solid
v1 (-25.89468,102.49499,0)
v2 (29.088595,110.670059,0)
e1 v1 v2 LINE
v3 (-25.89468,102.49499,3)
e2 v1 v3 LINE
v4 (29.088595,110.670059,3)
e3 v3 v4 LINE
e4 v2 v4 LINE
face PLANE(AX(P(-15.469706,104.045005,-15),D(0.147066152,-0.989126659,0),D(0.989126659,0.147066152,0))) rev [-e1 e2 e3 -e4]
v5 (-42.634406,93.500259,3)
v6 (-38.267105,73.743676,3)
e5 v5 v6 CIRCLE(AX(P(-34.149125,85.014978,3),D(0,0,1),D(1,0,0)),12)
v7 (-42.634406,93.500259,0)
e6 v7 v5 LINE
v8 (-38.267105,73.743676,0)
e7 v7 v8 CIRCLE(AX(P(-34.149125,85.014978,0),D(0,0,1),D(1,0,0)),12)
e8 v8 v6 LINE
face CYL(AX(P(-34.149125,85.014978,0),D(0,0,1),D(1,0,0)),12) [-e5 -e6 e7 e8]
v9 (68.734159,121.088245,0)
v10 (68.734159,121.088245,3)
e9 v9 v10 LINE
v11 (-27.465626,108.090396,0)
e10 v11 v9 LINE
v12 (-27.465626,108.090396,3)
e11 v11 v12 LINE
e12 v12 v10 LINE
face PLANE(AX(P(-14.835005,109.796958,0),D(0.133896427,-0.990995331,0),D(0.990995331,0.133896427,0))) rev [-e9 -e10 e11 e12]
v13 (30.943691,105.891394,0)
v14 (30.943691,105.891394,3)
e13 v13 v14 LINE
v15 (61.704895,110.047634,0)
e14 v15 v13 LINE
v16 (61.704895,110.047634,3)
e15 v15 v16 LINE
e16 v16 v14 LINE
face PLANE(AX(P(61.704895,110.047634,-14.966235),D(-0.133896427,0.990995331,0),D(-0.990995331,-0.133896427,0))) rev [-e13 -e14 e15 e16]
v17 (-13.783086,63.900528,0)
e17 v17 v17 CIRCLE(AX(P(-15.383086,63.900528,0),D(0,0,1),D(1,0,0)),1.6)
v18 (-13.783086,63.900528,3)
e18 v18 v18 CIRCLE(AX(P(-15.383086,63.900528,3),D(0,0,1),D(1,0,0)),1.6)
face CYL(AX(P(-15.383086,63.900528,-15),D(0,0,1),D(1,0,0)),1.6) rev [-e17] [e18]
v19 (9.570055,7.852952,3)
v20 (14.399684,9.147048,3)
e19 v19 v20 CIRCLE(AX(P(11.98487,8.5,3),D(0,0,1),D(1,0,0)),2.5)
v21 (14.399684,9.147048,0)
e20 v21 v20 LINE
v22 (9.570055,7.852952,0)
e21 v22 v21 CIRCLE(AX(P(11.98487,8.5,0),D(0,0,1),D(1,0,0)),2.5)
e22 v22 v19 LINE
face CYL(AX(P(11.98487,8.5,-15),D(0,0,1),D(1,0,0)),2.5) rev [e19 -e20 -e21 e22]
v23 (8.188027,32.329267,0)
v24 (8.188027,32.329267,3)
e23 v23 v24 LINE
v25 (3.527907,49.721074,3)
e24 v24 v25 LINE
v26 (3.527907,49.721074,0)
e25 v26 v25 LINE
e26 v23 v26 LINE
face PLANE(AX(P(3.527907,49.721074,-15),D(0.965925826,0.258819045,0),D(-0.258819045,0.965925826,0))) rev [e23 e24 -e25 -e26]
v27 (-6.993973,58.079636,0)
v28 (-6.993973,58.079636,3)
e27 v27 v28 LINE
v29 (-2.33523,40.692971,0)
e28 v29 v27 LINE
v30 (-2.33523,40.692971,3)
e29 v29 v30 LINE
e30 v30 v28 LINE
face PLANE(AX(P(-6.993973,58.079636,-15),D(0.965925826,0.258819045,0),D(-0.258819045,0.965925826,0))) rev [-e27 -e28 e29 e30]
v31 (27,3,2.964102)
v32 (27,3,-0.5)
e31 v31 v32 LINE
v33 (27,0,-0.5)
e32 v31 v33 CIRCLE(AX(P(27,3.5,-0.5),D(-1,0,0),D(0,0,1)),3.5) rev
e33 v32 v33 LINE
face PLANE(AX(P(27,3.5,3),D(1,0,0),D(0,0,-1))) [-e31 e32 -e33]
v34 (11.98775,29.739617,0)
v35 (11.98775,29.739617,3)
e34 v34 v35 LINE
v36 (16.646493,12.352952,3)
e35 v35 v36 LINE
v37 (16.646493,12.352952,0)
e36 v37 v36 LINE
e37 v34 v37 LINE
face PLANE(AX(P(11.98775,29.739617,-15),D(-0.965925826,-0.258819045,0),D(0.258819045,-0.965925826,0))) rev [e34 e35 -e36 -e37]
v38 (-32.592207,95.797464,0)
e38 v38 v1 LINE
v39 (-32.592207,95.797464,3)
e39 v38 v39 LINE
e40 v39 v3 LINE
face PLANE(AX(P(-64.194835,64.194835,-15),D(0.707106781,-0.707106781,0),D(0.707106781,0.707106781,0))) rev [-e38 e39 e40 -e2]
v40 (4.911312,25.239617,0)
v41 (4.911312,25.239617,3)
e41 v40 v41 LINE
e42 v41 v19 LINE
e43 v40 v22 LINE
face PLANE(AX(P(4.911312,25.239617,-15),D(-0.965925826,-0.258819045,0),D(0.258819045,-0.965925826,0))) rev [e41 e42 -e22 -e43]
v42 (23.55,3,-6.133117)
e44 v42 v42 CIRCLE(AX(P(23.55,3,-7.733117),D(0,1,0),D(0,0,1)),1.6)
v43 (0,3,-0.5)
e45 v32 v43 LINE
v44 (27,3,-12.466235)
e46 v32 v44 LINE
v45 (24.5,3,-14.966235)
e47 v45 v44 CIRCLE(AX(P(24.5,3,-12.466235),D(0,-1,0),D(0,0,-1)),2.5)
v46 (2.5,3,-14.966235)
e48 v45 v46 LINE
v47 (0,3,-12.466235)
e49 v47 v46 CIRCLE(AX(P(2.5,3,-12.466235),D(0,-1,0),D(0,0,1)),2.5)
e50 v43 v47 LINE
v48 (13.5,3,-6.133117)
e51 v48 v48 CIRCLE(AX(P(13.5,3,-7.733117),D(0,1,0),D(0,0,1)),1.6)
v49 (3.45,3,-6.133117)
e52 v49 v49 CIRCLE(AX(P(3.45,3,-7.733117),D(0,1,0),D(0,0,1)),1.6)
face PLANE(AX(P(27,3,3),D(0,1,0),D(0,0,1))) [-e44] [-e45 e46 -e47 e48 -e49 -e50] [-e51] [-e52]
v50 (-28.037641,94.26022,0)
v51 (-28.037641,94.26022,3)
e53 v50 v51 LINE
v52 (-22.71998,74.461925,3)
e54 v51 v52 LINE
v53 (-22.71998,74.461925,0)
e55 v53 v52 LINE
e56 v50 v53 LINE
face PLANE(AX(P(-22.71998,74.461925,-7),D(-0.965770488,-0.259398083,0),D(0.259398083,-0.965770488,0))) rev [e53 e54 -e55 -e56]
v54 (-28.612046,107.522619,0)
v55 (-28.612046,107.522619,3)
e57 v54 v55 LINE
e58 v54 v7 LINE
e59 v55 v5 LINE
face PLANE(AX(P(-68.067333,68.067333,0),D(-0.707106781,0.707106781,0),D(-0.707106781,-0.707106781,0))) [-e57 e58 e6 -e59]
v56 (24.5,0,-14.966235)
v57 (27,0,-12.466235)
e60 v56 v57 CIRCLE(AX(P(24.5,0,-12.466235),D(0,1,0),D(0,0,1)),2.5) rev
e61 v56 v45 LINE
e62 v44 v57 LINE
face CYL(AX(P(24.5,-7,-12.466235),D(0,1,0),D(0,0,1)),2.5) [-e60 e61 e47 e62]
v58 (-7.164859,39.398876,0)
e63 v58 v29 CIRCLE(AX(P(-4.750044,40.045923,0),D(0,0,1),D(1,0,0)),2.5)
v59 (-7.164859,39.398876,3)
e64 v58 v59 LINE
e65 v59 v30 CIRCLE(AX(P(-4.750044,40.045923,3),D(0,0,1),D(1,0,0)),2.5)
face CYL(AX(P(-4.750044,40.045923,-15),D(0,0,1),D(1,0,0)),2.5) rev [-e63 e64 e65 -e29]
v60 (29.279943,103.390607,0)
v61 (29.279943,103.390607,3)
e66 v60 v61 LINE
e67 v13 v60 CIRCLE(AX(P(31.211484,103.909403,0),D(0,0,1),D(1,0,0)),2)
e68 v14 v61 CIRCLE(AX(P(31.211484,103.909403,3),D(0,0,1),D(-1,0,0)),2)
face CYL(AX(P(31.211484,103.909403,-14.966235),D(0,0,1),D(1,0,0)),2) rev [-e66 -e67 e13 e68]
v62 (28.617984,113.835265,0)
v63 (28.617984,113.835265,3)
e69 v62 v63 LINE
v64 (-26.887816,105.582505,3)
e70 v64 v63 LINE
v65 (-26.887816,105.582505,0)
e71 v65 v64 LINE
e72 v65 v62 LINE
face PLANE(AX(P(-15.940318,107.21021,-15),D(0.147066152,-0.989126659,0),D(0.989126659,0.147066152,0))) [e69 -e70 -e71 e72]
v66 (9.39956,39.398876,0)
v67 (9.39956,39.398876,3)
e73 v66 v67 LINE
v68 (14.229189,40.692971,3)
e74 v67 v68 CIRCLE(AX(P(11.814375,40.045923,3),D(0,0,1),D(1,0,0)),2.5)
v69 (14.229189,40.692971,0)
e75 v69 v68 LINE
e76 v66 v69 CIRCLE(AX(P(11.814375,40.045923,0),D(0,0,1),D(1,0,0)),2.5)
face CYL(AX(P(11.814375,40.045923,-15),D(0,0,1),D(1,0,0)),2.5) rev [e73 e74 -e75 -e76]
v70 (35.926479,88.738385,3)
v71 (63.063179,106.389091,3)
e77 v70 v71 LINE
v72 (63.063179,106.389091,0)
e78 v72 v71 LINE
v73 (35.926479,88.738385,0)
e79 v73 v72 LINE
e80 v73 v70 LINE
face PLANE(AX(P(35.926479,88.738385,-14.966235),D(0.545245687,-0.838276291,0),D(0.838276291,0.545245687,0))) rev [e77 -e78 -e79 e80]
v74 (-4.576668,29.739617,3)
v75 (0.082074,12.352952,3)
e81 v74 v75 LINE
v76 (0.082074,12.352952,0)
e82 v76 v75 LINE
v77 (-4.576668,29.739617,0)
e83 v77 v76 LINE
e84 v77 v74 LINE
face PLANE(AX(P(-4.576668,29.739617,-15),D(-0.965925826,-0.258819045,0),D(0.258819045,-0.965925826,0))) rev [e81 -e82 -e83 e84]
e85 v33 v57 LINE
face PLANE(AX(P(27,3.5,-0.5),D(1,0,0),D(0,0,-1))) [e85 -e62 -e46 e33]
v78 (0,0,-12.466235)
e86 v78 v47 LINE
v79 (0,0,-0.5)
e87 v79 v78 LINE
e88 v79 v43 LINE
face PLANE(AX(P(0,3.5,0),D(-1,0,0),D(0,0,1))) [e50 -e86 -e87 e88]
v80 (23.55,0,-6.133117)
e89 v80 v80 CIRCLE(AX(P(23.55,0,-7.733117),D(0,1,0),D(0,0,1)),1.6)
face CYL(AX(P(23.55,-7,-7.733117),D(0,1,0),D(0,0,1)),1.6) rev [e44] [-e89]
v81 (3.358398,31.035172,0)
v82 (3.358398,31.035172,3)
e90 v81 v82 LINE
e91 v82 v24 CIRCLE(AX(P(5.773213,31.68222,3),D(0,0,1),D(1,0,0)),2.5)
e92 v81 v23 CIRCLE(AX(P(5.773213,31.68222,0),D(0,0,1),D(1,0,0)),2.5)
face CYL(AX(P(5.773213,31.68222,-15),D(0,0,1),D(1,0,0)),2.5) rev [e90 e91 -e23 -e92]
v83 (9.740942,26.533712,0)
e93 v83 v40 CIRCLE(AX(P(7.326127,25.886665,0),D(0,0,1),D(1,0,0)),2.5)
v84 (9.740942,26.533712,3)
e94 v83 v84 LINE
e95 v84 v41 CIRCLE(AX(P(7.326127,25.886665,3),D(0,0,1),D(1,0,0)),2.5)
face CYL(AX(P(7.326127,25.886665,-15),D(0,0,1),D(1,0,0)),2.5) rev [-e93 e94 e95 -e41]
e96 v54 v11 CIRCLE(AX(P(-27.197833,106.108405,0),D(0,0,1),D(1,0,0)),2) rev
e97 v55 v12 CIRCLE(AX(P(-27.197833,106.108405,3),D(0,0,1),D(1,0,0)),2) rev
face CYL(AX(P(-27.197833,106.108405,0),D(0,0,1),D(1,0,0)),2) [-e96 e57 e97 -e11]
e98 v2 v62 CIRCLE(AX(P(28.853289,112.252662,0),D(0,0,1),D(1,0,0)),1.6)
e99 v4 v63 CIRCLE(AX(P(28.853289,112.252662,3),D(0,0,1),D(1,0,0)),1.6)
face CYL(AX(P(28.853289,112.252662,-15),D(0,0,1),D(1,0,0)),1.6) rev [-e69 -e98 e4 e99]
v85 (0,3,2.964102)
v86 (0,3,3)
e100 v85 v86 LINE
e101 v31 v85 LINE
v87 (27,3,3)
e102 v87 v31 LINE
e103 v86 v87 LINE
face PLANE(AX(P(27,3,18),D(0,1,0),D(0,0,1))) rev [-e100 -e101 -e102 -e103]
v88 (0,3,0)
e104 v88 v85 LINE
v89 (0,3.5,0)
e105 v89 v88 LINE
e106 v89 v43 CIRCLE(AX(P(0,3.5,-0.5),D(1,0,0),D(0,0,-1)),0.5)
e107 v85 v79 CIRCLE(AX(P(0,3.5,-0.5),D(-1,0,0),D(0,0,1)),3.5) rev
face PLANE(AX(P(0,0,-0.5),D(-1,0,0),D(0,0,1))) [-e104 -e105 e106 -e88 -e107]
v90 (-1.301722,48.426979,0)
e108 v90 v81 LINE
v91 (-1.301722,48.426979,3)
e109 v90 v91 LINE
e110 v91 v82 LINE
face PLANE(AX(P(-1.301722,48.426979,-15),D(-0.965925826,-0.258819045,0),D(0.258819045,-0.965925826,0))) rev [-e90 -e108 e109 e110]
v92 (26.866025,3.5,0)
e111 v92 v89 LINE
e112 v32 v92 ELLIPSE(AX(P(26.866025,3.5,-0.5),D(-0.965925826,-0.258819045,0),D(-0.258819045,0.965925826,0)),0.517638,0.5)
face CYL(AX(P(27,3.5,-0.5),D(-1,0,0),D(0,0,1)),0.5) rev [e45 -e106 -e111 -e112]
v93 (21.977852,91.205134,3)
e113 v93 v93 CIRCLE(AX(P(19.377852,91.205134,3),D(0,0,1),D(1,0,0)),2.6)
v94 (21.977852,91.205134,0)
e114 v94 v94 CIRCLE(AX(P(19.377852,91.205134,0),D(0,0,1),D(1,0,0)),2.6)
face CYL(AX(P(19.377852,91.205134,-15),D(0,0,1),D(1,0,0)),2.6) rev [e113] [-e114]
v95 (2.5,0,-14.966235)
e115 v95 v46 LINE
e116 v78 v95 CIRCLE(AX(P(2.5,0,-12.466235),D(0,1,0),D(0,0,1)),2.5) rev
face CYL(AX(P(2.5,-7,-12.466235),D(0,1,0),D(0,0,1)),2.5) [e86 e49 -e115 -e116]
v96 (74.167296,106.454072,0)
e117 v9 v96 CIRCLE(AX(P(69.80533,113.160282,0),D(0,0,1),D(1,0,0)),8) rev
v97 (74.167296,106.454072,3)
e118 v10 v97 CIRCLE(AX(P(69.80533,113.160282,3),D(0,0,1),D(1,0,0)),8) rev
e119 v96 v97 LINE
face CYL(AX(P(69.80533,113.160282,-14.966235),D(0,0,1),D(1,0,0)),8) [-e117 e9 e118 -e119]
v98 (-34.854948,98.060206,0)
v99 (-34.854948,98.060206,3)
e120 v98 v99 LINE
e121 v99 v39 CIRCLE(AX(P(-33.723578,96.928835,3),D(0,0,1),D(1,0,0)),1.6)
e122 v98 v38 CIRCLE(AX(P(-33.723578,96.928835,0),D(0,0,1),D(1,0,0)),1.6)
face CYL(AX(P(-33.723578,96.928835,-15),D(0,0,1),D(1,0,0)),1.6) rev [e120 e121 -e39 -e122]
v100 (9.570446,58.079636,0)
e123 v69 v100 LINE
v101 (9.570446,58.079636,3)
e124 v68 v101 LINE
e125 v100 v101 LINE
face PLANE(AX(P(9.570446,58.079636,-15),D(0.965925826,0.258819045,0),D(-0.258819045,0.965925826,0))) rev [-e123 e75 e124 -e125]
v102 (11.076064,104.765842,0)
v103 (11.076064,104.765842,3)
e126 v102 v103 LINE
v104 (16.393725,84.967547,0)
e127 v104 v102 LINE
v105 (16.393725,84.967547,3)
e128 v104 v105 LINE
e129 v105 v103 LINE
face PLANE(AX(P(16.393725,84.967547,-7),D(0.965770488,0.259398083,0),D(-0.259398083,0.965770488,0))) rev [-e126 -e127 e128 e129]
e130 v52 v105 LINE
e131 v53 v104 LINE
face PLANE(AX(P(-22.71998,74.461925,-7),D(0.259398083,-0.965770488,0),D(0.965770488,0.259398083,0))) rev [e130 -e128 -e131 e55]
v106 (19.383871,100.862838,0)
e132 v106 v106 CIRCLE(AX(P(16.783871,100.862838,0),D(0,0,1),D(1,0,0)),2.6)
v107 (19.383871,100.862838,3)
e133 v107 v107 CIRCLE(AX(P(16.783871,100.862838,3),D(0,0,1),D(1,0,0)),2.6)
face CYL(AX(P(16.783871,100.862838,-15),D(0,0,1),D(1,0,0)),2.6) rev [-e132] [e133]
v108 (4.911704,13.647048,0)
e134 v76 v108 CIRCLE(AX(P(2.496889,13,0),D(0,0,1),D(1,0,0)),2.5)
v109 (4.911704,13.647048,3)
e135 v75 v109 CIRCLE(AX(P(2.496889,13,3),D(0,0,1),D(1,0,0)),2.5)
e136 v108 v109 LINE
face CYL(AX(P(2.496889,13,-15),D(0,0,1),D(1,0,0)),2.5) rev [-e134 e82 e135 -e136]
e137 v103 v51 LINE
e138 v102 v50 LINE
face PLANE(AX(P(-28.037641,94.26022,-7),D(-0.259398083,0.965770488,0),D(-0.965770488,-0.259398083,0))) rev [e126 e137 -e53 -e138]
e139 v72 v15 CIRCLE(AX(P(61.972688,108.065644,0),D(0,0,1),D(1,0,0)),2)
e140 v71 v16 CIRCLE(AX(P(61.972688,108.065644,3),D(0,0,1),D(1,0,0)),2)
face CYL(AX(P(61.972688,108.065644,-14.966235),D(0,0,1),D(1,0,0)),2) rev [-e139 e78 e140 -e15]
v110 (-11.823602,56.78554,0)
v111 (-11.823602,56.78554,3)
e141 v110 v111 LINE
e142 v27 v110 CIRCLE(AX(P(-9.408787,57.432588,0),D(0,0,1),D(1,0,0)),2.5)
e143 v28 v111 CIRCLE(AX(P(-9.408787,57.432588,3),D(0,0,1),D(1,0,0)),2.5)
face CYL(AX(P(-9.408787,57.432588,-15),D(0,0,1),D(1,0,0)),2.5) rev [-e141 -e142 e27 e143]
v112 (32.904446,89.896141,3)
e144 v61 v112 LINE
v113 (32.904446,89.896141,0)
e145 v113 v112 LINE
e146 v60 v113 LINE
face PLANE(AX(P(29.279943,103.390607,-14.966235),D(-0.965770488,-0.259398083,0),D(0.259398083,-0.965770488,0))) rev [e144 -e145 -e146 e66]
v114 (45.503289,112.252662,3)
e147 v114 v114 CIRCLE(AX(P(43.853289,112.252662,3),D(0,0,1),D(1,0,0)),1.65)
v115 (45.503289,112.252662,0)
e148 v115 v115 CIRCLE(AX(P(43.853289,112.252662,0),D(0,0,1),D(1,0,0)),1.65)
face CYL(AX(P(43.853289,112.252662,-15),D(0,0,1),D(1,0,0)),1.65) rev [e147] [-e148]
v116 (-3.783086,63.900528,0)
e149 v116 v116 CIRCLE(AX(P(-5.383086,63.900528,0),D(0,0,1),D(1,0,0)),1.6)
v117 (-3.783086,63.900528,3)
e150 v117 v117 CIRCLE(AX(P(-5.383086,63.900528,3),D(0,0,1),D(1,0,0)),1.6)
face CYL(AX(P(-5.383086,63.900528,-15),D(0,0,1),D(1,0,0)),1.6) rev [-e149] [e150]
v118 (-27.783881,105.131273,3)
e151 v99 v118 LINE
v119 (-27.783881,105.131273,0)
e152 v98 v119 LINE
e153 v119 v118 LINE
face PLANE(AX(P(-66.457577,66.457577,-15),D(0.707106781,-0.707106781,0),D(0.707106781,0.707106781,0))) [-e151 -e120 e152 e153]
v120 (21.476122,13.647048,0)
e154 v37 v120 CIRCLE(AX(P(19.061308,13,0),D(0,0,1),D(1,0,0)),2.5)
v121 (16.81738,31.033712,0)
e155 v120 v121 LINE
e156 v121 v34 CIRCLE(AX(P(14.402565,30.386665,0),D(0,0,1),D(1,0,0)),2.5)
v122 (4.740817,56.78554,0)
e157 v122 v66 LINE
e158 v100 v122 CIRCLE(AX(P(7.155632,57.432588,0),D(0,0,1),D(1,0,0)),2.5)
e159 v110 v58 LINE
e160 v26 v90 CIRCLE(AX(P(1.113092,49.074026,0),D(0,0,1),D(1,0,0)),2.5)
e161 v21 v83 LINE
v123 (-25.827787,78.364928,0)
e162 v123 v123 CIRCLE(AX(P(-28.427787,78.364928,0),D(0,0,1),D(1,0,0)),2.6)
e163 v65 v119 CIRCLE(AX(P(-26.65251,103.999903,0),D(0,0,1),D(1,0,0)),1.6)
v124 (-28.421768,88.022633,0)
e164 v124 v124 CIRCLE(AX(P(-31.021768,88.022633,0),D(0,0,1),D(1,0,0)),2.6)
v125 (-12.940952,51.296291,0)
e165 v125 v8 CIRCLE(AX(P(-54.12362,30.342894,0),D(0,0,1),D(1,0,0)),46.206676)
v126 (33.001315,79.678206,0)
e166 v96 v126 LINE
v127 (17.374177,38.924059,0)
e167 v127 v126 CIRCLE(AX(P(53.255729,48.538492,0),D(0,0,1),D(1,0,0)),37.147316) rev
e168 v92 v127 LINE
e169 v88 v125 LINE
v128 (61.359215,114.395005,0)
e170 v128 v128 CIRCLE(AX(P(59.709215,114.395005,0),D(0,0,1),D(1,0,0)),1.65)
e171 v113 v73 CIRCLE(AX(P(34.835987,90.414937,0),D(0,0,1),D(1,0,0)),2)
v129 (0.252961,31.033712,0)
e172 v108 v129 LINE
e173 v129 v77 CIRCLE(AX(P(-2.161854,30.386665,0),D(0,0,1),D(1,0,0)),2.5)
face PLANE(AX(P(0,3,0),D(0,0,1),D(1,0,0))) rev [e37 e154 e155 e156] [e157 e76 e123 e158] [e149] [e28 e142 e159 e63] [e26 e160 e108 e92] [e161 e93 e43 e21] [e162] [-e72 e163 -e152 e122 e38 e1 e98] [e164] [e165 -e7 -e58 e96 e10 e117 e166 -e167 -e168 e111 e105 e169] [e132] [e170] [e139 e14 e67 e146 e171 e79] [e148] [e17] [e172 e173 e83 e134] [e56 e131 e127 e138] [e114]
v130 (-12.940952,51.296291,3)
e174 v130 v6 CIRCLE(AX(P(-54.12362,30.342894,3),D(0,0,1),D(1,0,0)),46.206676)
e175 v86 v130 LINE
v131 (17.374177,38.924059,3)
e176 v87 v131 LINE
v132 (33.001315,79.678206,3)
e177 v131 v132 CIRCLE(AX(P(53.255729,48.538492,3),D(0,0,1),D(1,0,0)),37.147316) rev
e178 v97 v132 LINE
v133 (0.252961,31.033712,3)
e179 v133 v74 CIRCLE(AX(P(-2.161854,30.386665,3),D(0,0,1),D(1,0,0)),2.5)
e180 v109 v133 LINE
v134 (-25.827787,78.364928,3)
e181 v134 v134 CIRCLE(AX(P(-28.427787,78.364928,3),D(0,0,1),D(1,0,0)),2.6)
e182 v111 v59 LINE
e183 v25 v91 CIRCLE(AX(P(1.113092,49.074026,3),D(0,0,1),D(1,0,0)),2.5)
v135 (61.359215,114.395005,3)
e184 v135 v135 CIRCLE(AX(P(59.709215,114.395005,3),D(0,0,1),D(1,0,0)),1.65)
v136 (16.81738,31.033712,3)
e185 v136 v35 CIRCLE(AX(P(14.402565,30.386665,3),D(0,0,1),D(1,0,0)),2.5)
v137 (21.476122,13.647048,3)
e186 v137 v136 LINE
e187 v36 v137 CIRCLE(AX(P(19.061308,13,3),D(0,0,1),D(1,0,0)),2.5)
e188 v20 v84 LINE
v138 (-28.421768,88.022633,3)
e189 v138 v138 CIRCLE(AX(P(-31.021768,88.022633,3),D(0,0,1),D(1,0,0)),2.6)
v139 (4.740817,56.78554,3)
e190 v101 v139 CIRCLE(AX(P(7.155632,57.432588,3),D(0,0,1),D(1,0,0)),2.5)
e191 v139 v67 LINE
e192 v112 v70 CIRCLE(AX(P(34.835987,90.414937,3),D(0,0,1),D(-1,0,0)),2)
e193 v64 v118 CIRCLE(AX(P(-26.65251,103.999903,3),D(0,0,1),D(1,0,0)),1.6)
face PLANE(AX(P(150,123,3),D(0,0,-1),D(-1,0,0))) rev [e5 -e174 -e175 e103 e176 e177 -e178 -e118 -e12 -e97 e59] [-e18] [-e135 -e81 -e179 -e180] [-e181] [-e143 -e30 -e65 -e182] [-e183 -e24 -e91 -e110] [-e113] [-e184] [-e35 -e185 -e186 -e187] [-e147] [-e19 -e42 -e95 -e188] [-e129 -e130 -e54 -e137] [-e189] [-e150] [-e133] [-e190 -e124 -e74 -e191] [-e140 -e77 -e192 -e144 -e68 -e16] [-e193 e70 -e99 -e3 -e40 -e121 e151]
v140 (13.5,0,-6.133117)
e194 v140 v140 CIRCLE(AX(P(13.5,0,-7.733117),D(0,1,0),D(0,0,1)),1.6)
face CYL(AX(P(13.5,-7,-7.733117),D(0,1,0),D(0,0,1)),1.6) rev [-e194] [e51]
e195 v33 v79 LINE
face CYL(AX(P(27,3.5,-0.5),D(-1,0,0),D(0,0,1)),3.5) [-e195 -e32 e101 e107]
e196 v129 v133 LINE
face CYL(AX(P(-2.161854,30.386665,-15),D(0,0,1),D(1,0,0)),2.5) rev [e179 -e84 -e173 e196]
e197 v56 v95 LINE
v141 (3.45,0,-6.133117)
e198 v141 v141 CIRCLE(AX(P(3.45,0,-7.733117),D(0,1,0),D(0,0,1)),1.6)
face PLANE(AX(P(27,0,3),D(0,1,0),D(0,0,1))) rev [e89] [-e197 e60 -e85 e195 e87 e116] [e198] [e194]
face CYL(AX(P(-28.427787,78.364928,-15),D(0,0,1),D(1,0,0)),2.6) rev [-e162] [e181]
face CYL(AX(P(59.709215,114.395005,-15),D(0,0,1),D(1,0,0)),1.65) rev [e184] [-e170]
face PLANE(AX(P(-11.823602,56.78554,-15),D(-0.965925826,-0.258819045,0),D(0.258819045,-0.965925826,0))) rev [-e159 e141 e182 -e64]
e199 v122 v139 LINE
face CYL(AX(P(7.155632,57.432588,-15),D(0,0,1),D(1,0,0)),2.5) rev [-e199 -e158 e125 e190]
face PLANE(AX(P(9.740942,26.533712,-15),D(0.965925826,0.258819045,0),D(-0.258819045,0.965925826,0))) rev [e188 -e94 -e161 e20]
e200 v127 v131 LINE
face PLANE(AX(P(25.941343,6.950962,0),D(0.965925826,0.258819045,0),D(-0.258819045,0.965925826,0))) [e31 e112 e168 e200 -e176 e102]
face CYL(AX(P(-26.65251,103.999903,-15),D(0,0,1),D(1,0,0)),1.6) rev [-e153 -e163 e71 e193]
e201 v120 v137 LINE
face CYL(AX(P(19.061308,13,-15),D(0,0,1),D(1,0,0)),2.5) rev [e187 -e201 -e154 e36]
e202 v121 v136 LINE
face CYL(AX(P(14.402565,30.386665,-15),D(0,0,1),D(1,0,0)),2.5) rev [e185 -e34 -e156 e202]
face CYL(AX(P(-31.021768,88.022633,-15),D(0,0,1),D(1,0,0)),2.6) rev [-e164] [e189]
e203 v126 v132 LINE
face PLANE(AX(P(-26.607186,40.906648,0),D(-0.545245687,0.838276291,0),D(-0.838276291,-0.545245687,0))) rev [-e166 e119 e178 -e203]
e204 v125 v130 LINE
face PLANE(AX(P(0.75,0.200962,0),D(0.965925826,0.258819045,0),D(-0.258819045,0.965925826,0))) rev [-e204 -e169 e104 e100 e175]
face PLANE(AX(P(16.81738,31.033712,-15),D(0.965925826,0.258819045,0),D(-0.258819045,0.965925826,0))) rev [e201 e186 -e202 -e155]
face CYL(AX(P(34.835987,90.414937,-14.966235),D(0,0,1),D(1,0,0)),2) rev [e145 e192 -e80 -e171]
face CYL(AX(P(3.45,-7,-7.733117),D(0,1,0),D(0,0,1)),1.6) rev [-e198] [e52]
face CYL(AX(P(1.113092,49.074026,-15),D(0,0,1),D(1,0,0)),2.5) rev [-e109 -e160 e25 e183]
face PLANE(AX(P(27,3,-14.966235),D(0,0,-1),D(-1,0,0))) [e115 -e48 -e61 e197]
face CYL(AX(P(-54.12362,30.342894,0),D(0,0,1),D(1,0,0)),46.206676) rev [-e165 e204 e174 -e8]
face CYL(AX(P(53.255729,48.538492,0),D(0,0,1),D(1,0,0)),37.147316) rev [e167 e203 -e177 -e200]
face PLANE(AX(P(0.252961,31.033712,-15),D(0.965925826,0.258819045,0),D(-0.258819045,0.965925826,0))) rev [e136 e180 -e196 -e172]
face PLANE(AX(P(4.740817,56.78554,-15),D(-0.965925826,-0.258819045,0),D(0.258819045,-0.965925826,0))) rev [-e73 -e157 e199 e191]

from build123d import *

# Parameters (mm, degrees)
EXTRUDE_1_DEPTH              = 3
EXTRUDE_2_DEPTH              = 120
CUT_EXTRUDE_1_DEPTH          = 195.561044405
SKETCH_9_R                   = 0.555167329
CUT_EXTRUDE_3_DEPTH          = 10
HOLE_WIZARD_M5_1_D           = 4.2
HOLE_WIZARD_M5_1_DEPTH       = 12.4
HOLE_WIZARD_M5_1_CSINK_D     = 5.05
HOLE_WIZARD_M5_1_CSINK_ANGLE = 90
HOLE_WIZARD_M5_1_TIP         = 1.2618073
SKETCH_12_R                  = 0.419228838
SKETCH_12_R_2                = 0.457437139
CUT_EXTRUDE_4_DEPTH          = 10
HOLE_WIZARD_M3_1_D           = 2.5
HOLE_WIZARD_M3_1_DEPTH       = 7.5
HOLE_WIZARD_M3_1_CSINK_D     = 3.05
HOLE_WIZARD_M3_1_CSINK_ANGLE = 90
HOLE_WIZARD_M3_1_TIP         = 0.751075774
SKETCH_31_W                  = 27
SKETCH_31_H                  = 3
CUT_EXTRUDE_7_DEPTH          = 18
SKETCH_42_R                  = 1.6
SKETCH_42_R_2                = 2.6
CUT_EXTRUDE_9_DEPTH          = 18
SKETCH_43_R                  = 1.65
CUT_EXTRUDE_10_DEPTH         = 18
SM_BASE_FLANGE_2_DEPTH       = 27
CUT_EXTRUDE_11_DEPTH         = 10
SKETCH_54_R                  = 1.6
CUT_EXTRUDE_12_DEPTH         = 10
CUT_EXTRUDE_13_DEPTH         = 153.01995181
CUT_EXTRUDE_14_DEPTH         = 153.01995181


# Sheet-metal steps are written as plain solids
with BuildPart() as part:
    # 草图2 → 凸台-拉伸1 (new body)
    with BuildSketch(Plane(origin=(0, 0, 0), x_dir=(1, 0, 0), z_dir=(0, 1, 0))):
        with BuildLine():
            Line((0, 0), (27, 0))
            Line((27, 0), (27, -16))
            ThreePointArc((27, -16), (26.414213562, -17.414213562), (25, -18))
            Line((25, -18), (2, -18))
            ThreePointArc((2, -18), (0.585786438, -17.414213562), (0, -16))
            Line((0, -16), (0, 0))
        make_face()
    extrude(amount=EXTRUDE_1_DEPTH)

    # Sketch 3 → 凸台-拉伸2 (add)
    with BuildSketch(Plane(origin=(0, 3, 0), x_dir=(1, 0, 0), z_dir=(0, 1, 0))):
        Polygon((0, 0), (150, 0), (150, -3), (-100, -3), (-100, 0), align=None)
    extrude(amount=EXTRUDE_2_DEPTH)

    # Sketch 4 → 切除-拉伸1 (cut, through all)
    with BuildSketch(Plane.XY.offset(3)):
        with BuildLine():
            Line((-27.465625599, 108.090395999), (81.955038276, 122.874558425))
            ThreePointArc((81.955038276, 122.874558425), (87.311898998, 119.659835192), (85.350748847, 113.728200311))
            Line((85.350748847, 113.728200311), (33.001315422, 79.678206183))
            ThreePointArc((33.001315422, 79.678206183), (18.570908538, 61.838352676), (17.374177378, 38.924059091))
            Line((17.374177378, 38.924059091), (27, 3))
            Line((27, 3), (150, 3))
            Line((150, 3), (150, 123))
            Line((150, 123), (-100, 123))
            Line((-100, 123), (-100, 3))
            Line((-100, 3), (0, 3))
            Line((0, 3), (-12.940952255, 51.296291314))
            ThreePointArc((-12.940952255, 51.296291314), (-23.474992402, 64.922058411), (-38.267104772, 73.743676313))
            ThreePointArc((-38.267104772, 73.743676313), (-45.866257029, 82.424841396), (-42.634405947, 93.500259258))
            Line((-42.634405947, 93.500259258), (-28.612046307, 107.522618899))
            ThreePointArc((-28.612046307, 107.522618899), (-28.085458288, 107.900644409), (-27.465625599, 108.090395999))
        make_face()
    extrude(amount=-CUT_EXTRUDE_1_DEPTH, mode=Mode.SUBTRACT)

    # 草图9 → 切除-拉伸3 (cut)
    with BuildSketch(Plane.XY.offset(3)):
        with Locations((-28.427787155, 78.364928444)):
            Circle(SKETCH_9_R)
        with Locations((-31.021767983, 88.02263332)):
            Circle(SKETCH_9_R)
        with Locations((19.37785198, 91.205133539)):
            Circle(SKETCH_9_R)
        with Locations((16.783871152, 100.862838415)):
            Circle(SKETCH_9_R)
        Polygon((-22.719980027, 74.461924756), (-28.037640723, 94.260219752), (11.076064024, 104.765842103), (16.39372472, 84.967547107), align=None)
    extrude(amount=-CUT_EXTRUDE_3_DEPTH, mode=Mode.SUBTRACT)

    # M5 螺纹孔1
    with Locations(Plane.XY.offset(3)):
        with Locations((-31.021767983, 88.02263332), (-28.427787155, 78.364928444), (16.783871152, 100.862838415), (19.37785198, 91.205133539)):
            CounterSinkHole(HOLE_WIZARD_M5_1_D / 2, HOLE_WIZARD_M5_1_CSINK_D / 2, depth=HOLE_WIZARD_M5_1_DEPTH, counter_sink_angle=HOLE_WIZARD_M5_1_CSINK_ANGLE)
            with Locations((0, 0, -(HOLE_WIZARD_M5_1_DEPTH + HOLE_WIZARD_M5_1_TIP / 2))):  # 118° drill point
                Cone(0, HOLE_WIZARD_M5_1_D / 2, HOLE_WIZARD_M5_1_TIP, mode=Mode.SUBTRACT)

    # 草图12 → 切除-拉伸4 (cut)
    with BuildSketch(Plane.XY.offset(3)):
        with Locations((-5.383085829, 63.900528175)):
            Circle(SKETCH_12_R)
        with Locations((-15.383085829, 63.900528175)):
            Circle(SKETCH_12_R_2)
        Polygon((-27.731348581, 94.083626651), (10.899470923, 104.45954996), (16.087432577, 85.144140208), (-22.543386926, 74.768216899), align=None)
    extrude(amount=-CUT_EXTRUDE_4_DEPTH, mode=Mode.SUBTRACT)

    # M3 螺纹孔1
    with Locations(Plane.XY.offset(3)):
        with Locations((-15.383085829, 63.900528175), (-5.383085829, 63.900528175)):
            CounterSinkHole(HOLE_WIZARD_M3_1_D / 2, HOLE_WIZARD_M3_1_CSINK_D / 2, depth=HOLE_WIZARD_M3_1_DEPTH, counter_sink_angle=HOLE_WIZARD_M3_1_CSINK_ANGLE)
            with Locations((0, 0, -(HOLE_WIZARD_M3_1_DEPTH + HOLE_WIZARD_M3_1_TIP / 2))):  # 118° drill point
                Cone(0, HOLE_WIZARD_M3_1_D / 2, HOLE_WIZARD_M3_1_TIP, mode=Mode.SUBTRACT)

    # 草图31 → 切除-拉伸7 (cut)
    with BuildSketch(Plane(origin=(0, 0, 0), x_dir=(-1, 0, 0), z_dir=(0, 0, -1))):
        with Locations((-13.5, 1.5)):
            Rectangle(SKETCH_31_W, SKETCH_31_H)
    extrude(amount=-CUT_EXTRUDE_7_DEPTH, mode=Mode.SUBTRACT)

    # 草图42 → 切除-拉伸9 (cut)
    with BuildSketch(Plane.XY.offset(3)):
        with Locations((-15.383085829, 63.900528175)):
            Circle(SKETCH_42_R)
        with Locations((-5.383085829, 63.900528175)):
            Circle(SKETCH_42_R)
        with Locations((-28.427787155, 78.364928444)):
            Circle(SKETCH_42_R_2)
        with Locations((-31.021767983, 88.02263332)):
            Circle(SKETCH_42_R_2)
        with Locations((16.783871152, 100.862838415)):
            Circle(SKETCH_42_R_2)
        with Locations((19.37785198, 91.205133539)):
            Circle(SKETCH_42_R_2)
        with BuildLine():
            Line((11.987750487, 29.73961726), (16.646493299, 12.352952387))
            ThreePointArc((16.646493299, 12.352952387), (19.708355477, 10.585185434), (21.47612243, 13.647047613))
            Line((21.47612243, 13.647047613), (16.817379618, 31.033712486))
            ThreePointArc((16.817379618, 31.033712486), (13.75551744, 32.801479439), (11.987750487, 29.73961726))
        make_face()
        with BuildLine():
            Line((-11.823601663, 56.785540397), (-7.164858851, 39.398875523))
            ThreePointArc((-7.164858851, 39.398875523), (-4.102996672, 37.63110857), (-2.335229719, 40.692970749))
            Line((-2.335229719, 40.692970749), (-6.993972531, 58.079635622))
            ThreePointArc((-6.993972531, 58.079635622), (-10.05583471, 59.847402575), (-11.823601663, 56.785540397))
        make_face()
        with BuildLine():
            Line((-4.5766684, 29.73961726), (0.082074412, 12.352952387))
            ThreePointArc((0.082074412, 12.352952387), (3.14393659, 10.585185434), (4.911703543, 13.647047613))
            Line((4.911703543, 13.647047613), (0.252960732, 31.033712486))
            ThreePointArc((0.252960732, 31.033712486), (-2.808901447, 32.801479439), (-4.5766684, 29.73961726))
        make_face()
        with BuildLine():
            Line((-1.301722379, 48.426978761), (3.358398139, 31.035172218))
            ThreePointArc((3.358398139, 31.035172218), (6.420260317, 29.267405265), (8.18802727, 32.329267444))
            Line((8.18802727, 32.329267444), (3.527906752, 49.721073986))
            ThreePointArc((3.527906752, 49.721073986), (0.466044574, 51.488840939), (-1.301722379, 48.426978761))
        make_face()
        with BuildLine():
            Line((4.740817224, 56.785540397), (9.399560036, 39.398875523))
            ThreePointArc((9.399560036, 39.398875523), (12.461422214, 37.63110857), (14.229189167, 40.692970749))
            Line((14.229189167, 40.692970749), (9.570446355, 58.079635622))
            ThreePointArc((9.570446355, 58.079635622), (6.508584177, 59.847402575), (4.740817224, 56.785540397))
        make_face()
        with BuildLine():
            Line((4.911312409, 25.23961726), (9.570055221, 7.852952387))
            ThreePointArc((9.570055221, 7.852952387), (12.6319174, 6.085185434), (14.399684353, 9.147047613))
            Line((14.399684353, 9.147047613), (9.740941541, 26.533712486))
            ThreePointArc((9.740941541, 26.533712486), (6.679079362, 28.301479439), (4.911312409, 25.23961726))
        make_face()
    extrude(amount=-CUT_EXTRUDE_9_DEPTH, mode=Mode.SUBTRACT)

    # 草图43 → 切除-拉伸10 (cut)
    with BuildSketch(Plane.XY.offset(3)):
        with Locations((43.853289388, 112.252662001)):
            Circle(SKETCH_43_R)
        with Locations((59.70921469, 114.395004835)):
            Circle(SKETCH_43_R)
        with BuildLine():
            Line((-34.854948443, 98.060205677), (-27.783880632, 105.131273489))
            ThreePointArc((-27.783880632, 105.131273489), (-27.372130398, 105.428939436), (-26.887815625, 105.582505293))
            Line((-26.887815625, 105.582505293), (28.617983545, 113.835264655))
            ThreePointArc((28.617983545, 113.835264655), (30.435892042, 112.487967844), (29.088595231, 110.670059347))
            Line((29.088595231, 110.670059347), (-25.894680467, 102.494990254))
            Line((-25.894680467, 102.494990254), (-32.592206744, 95.797463977))
            ThreePointArc((-32.592206744, 95.797463977), (-34.854948443, 95.797463977), (-34.854948443, 98.060205677))
        make_face()
    extrude(amount=-CUT_EXTRUDE_10_DEPTH, mode=Mode.SUBTRACT)

    # 草图55 → 切除-拉伸13 (cut, through all)
    with BuildSketch(Plane.XY.offset(3)):
        with BuildLine():
            Line((61.704894996, 110.047634391), (30.943691051, 105.891393518))
            ThreePointArc((30.943691051, 105.891393518), (29.546325951, 105.017215559), (29.27994293, 103.39060669))
            Line((29.27994293, 103.39060669), (32.904446455, 89.896140965))
            ThreePointArc((32.904446455, 89.896140965), (34.120486844, 88.547302554), (35.926478804, 88.738384548))
            Line((35.926478804, 88.738384548), (63.063179225, 106.389091146))
            ThreePointArc((63.063179225, 106.389091146), (63.847639285, 108.761745098), (61.704894996, 110.047634391))
        make_face()
    extrude(amount=-CUT_EXTRUDE_13_DEPTH, mode=Mode.SUBTRACT)

    # 草图56 → 切除-拉伸14 (cut, through all)
    with BuildSketch(Plane.XY.offset(3)):
        with BuildLine():
            Line((85.350748847, 113.728200311), (74.167295897, 106.45407178))
            ThreePointArc((74.167295897, 106.45407178), (77.30513614, 115.944687589), (68.734158983, 121.088244762))
            Line((68.734158983, 121.088244762), (81.955038276, 122.874558425))
            ThreePointArc((81.955038276, 122.874558425), (87.311898998, 119.659835192), (85.350748847, 113.728200311))
        make_face()
    extrude(amount=-CUT_EXTRUDE_14_DEPTH, mode=Mode.SUBTRACT)


with BuildPart() as body_2:
    # 草图44 → 基体-法兰2 (new body)
    with BuildSketch(Plane(origin=(0, 0, 0), x_dir=(0, 0, -1), z_dir=(1, 0, 0))):
        with BuildLine():
            Line((-3, 6), (-3, 3.5))
            ThreePointArc((-3, 3.5), (-1.974873734, 1.025126266), (0.5, 0))
            Line((0.5, 0), (14.96623469, 0))
            Line((14.96623469, 0), (14.96623469, 3))
            Line((14.96623469, 3), (0.5, 3))
            ThreePointArc((0.5, 3), (0.146446609, 3.146446609), (0, 3.5))
            Line((0, 3.5), (0, 6))
            Line((0, 6), (-3, 6))
        make_face()
    extrude(amount=SM_BASE_FLANGE_2_DEPTH)

    # 草图53 → 切除-拉伸11 (cut)
    with BuildSketch(Plane.XY.offset(3)):
        Polygon((27, 3), (26.196152423, 6), (27, 6), align=None)
    extrude(amount=-CUT_EXTRUDE_11_DEPTH, mode=Mode.SUBTRACT)

    # 草图54 → 切除-拉伸12 (cut)
    with BuildSketch(Plane(origin=(0, 3, 0), x_dir=(1, 0, 0), z_dir=(0, 1, 0))):
        with Locations(Location((3.45, 7.733117345, 0), (0, 0, 270))):
            Circle(SKETCH_54_R)
        with Locations(Location((23.55, 7.733117345, 0), (0, 0, 270))):
            Circle(SKETCH_54_R)
        with Locations(Location((13.5, 7.733117345, 0), (0, 0, 270))):
            Circle(SKETCH_54_R)
        with BuildLine():
            Line((24.5, 14.96623469), (27, 14.96623469))
            Line((27, 14.96623469), (27, 12.46623469))
            ThreePointArc((27, 12.46623469), (26.267766953, 14.234001643), (24.5, 14.96623469))
        make_face()
        with BuildLine():
            Line((0, 14.96623469), (2.5, 14.96623469))
            ThreePointArc((2.5, 14.96623469), (0.732233047, 14.234001643), (0, 12.46623469))
            Line((0, 12.46623469), (0, 14.96623469))
        make_face()
    extrude(amount=-CUT_EXTRUDE_12_DEPTH, mode=Mode.SUBTRACT)


with BuildPart() as part_1:
    add(part.part)

    # Combine 1: union body 2
    add(body_2.part)


solid = part_1.part
